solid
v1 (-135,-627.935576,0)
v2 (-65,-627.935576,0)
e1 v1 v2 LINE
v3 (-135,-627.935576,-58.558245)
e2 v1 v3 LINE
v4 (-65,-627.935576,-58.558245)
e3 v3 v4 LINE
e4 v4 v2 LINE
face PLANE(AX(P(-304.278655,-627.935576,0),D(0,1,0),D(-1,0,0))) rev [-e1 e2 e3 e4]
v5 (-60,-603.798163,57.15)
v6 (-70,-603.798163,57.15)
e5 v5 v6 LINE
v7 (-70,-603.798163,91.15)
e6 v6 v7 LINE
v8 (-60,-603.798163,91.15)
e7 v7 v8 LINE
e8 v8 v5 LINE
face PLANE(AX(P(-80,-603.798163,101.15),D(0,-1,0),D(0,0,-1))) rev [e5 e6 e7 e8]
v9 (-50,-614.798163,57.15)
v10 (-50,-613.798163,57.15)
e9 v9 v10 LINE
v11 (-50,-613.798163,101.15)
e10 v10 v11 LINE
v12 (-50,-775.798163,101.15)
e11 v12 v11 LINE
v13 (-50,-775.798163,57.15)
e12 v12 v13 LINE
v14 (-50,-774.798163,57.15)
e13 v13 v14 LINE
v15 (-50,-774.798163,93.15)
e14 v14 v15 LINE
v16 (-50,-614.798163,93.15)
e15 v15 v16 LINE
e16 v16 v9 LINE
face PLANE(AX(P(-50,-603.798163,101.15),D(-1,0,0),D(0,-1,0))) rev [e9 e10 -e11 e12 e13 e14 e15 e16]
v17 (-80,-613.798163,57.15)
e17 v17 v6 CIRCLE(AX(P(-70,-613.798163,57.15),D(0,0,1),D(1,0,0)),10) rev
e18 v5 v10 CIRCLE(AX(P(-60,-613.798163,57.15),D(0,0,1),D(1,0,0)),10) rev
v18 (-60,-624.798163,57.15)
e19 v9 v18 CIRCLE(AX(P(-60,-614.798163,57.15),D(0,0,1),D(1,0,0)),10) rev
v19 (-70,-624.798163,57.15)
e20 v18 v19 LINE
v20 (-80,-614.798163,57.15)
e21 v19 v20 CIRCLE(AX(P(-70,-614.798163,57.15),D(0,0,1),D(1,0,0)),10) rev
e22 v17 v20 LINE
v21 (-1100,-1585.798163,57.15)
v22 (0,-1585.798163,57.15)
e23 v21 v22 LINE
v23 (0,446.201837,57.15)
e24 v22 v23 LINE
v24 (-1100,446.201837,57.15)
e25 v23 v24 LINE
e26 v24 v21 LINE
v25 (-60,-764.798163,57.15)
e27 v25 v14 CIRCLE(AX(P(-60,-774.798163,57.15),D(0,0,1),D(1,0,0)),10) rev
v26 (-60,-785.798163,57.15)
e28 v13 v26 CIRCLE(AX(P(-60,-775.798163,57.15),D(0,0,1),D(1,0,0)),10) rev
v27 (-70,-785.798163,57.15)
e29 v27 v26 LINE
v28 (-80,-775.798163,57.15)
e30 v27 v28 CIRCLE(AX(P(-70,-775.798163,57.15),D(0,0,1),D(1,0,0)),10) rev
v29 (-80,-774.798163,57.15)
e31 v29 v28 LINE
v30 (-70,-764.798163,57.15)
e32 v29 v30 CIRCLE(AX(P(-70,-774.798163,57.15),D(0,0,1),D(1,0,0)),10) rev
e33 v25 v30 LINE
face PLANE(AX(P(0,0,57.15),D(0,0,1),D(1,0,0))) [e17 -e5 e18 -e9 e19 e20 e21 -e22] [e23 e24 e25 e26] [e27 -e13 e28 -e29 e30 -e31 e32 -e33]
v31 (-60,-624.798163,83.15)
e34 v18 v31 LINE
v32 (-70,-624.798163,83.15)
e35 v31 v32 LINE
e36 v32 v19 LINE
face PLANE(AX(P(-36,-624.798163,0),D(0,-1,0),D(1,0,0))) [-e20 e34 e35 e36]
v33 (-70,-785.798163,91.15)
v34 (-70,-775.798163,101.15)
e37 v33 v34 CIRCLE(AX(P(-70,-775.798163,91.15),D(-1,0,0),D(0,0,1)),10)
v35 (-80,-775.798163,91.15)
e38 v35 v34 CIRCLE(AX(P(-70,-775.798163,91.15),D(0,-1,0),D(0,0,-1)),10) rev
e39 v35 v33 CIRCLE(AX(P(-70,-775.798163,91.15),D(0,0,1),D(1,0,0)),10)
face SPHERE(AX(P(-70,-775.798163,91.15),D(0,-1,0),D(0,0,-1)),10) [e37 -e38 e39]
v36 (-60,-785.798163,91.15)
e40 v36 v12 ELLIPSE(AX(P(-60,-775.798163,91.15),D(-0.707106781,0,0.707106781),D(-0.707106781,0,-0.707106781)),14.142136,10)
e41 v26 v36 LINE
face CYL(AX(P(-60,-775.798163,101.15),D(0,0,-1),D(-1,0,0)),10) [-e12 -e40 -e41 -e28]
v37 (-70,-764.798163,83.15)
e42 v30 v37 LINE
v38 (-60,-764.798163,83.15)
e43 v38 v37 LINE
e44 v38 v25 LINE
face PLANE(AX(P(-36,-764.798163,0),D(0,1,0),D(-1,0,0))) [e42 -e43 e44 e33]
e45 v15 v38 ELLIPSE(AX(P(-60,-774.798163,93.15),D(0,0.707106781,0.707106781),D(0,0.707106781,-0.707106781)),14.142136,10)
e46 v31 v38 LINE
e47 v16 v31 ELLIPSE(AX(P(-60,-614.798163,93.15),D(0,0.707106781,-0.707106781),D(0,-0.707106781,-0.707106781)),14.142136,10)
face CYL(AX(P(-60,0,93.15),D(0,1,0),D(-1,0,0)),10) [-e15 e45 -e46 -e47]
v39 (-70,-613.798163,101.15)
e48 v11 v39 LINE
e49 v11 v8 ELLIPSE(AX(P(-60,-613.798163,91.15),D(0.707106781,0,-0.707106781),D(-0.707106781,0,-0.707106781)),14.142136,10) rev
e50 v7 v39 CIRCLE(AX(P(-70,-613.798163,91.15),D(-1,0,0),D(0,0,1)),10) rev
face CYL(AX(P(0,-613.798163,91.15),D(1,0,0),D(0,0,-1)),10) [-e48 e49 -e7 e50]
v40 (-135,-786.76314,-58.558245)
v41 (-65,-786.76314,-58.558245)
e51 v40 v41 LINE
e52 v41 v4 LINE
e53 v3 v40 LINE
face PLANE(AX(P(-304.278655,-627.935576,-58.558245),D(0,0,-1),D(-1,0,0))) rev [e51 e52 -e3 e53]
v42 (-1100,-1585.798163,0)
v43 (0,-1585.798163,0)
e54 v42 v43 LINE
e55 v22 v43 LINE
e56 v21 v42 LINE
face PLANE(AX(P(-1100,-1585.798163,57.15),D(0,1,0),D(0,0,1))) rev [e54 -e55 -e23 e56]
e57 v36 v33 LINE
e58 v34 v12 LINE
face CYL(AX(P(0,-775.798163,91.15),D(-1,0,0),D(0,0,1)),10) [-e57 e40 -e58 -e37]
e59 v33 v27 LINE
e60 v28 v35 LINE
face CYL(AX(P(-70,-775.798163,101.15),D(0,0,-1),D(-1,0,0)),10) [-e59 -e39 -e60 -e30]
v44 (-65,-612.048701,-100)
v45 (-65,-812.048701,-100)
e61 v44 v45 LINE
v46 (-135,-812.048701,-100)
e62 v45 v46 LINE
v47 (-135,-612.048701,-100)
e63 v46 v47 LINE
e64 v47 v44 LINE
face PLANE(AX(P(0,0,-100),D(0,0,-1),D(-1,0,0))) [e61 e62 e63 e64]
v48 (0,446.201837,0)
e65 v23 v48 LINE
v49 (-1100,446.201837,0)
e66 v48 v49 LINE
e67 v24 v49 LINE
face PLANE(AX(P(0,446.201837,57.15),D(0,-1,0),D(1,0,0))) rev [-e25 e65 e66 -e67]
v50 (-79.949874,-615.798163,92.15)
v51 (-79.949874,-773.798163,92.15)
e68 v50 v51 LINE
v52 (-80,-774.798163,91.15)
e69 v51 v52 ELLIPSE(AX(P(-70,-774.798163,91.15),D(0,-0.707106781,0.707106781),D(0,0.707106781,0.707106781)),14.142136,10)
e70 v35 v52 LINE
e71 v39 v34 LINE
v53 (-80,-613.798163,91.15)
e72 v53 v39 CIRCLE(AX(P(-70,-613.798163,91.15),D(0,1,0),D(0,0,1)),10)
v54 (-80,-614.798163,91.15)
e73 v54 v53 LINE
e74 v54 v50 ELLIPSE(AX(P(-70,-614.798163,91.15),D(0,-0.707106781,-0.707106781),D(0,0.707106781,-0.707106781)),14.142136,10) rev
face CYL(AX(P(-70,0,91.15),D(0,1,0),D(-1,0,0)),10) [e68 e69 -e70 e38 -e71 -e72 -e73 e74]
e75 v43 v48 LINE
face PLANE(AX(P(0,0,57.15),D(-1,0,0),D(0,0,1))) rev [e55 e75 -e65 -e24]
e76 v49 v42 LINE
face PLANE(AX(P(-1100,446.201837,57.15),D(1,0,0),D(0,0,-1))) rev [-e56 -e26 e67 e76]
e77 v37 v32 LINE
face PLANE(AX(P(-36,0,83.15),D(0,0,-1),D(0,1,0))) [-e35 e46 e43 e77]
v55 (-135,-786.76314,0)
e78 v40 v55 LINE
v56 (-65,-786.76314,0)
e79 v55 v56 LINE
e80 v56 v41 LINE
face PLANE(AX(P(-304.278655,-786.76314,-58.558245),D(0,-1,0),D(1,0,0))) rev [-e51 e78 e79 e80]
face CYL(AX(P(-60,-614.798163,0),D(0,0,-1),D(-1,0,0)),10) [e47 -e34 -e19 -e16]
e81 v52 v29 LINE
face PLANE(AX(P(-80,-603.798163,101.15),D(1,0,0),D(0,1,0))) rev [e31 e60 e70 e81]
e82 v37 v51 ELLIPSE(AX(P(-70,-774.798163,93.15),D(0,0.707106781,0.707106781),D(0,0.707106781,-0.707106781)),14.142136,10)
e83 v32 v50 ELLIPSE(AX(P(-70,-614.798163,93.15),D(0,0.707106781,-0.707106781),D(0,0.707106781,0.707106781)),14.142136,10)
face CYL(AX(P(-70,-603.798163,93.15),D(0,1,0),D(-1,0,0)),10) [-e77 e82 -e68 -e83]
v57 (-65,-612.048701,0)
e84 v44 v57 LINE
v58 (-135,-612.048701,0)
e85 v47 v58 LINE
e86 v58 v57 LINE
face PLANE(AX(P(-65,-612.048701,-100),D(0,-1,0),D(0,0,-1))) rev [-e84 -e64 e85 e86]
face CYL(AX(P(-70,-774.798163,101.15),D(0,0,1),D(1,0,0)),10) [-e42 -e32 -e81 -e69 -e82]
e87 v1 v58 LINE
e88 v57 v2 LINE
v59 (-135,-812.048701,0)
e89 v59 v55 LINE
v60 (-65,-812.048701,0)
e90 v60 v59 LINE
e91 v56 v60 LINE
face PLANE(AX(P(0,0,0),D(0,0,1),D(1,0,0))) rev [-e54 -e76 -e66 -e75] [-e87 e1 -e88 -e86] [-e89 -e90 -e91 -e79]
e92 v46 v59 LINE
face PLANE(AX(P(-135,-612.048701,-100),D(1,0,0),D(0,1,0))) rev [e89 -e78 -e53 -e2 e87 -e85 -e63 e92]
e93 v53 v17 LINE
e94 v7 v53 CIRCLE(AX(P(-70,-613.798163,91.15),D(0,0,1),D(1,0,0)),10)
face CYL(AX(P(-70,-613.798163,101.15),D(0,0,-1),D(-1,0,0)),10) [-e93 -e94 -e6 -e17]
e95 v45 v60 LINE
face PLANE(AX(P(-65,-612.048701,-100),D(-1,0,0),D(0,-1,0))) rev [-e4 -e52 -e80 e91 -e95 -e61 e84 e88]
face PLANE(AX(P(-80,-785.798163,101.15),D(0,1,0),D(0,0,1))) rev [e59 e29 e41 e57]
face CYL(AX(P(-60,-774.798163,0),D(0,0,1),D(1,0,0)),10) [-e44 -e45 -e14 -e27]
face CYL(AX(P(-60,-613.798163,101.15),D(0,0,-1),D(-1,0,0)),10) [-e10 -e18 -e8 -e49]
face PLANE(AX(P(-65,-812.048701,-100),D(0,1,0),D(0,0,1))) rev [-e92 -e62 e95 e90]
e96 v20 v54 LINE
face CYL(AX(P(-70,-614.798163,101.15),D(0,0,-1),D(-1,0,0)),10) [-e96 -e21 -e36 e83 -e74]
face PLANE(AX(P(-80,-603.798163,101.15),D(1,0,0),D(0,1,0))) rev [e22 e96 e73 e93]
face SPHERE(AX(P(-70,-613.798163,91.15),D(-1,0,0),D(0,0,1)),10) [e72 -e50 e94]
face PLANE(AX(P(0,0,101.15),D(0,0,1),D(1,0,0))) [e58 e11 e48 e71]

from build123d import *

# Parameters (mm, degrees)
BOSS_EXTRUDE2_DEPTH = 57.15
BOSS_EXTRUDE3_DEPTH = 44
CUT_EXTRUDE1_DEPTH  = 44
FILLET1_R           = 10
BOSS_EXTRUDE4_DEPTH = 100
SKETCH8_W           = 58.558244651631945
SKETCH8_H           = 158.82756414249673
CUT_EXTRUDE3_DEPTH  = 70


with BuildPart() as part:
    # Sketch1 → Boss-Extrude2 (new body)
    with BuildSketch(Plane.XY):
        Polygon((0, 0), (0, 446.2018372120283), (-1100, 446.2018372120282), (-1100, -1585.7981627879717), (0, -1585.7981627879717), align=None)
    extrude(amount=BOSS_EXTRUDE2_DEPTH)

    # Sketch4 → Boss-Extrude3 (add)
    with BuildSketch(Plane.XY.offset(57.15)):
        Polygon((-79.99999999999993, -603.7981627879718), (-49.999999999999936, -603.7981627879718), (-49.999999999999915, -785.7981627879718), (-79.9999999999999, -785.7981627879718), align=None)
    extrude(amount=BOSS_EXTRUDE3_DEPTH)

    # Sketch5 → Cut-Extrude1 (cut)
    with BuildSketch(Plane.ZY.offset(80.00000000000003)):
        Polygon((83.14999999999999, -624.7981627879717), (57.150000000000006, -624.7981627879717), (57.15, -764.7981627879717), (83.15, -764.7981627879717), align=None)
    extrude(amount=-CUT_EXTRUDE1_DEPTH, mode=Mode.SUBTRACT)

    # Fillet1
    # the kernel refuses this fillet: 10 mm, written as the material it takes off along each edge
    with BuildSketch(Plane(origin=(-69.99999999999993, -613.7981627879718, 91.15), x_dir=(-1, -1.6e-16, 0), z_dir=(0, 1, 0))) as fillet1_piece_1_section:
        Polygon((0, 0), (FILLET1_R, 0), (FILLET1_R, FILLET1_R), (0, FILLET1_R), align=None)
    fillet1_piece_1 = extrude(amount=FILLET1_R, mode=Mode.PRIVATE)
    fillet1_piece_1 = fillet1_piece_1 - Plane(origin=(-69.99999999999993, -613.7981627879718, 91.15), x_dir=(0.7071067811865475, 0, -0.7071067811865475), z_dir=(0, 1, 0)) * Sphere(FILLET1_R, mode=Mode.PRIVATE)
    add(fillet1_piece_1, mode=Mode.SUBTRACT)
    with BuildSketch(Plane(origin=(-69.9999999999999, -775.7981627879718, 91.15), x_dir=(0, 0, 1), z_dir=(-1, -1.6e-16, 0))) as fillet1_piece_2_section:
        Polygon((0, 0), (FILLET1_R, 0), (FILLET1_R, -FILLET1_R), (0, -FILLET1_R), align=None)
    fillet1_piece_2 = extrude(amount=FILLET1_R, mode=Mode.PRIVATE)
    fillet1_piece_2 = fillet1_piece_2 - Plane(origin=(-69.9999999999999, -775.7981627879718, 91.15), x_dir=(0, 0.7071067811865475, -0.7071067811865475), z_dir=(-1, -1.6e-16, 0)) * Sphere(FILLET1_R, mode=Mode.PRIVATE)
    add(fillet1_piece_2, mode=Mode.SUBTRACT)
    with BuildSketch(Plane(origin=(-49.999999999999915, -785.7981627879718, 57.15), x_dir=(-1, 0, 0), z_dir=(0, 0, 1))) as fillet1_piece_3:
        with BuildLine():
            CenterArc((FILLET1_R, -FILLET1_R), FILLET1_R, 90, 90)
            Line((0, -FILLET1_R), (0, 0))
            Line((0, 0), (FILLET1_R, 0))
        make_face()
    extrude(amount=69, mode=Mode.SUBTRACT)
    with BuildSketch(Plane(origin=(-49.999999999999936, -603.7981627879718, 57.15), x_dir=(0, -1, 0), z_dir=(0, 0, 1))) as fillet1_piece_4:
        with BuildLine():
            CenterArc((FILLET1_R, -FILLET1_R), FILLET1_R, 90, 90)
            Line((0, -FILLET1_R), (0, 0))
            Line((0, 0), (FILLET1_R, 0))
        make_face()
    extrude(amount=69, mode=Mode.SUBTRACT)
    with BuildSketch(Plane(origin=(-79.99999999999993, -603.7981627879718, 57.15), x_dir=(1, 0, 0), z_dir=(0, 0, 1))) as fillet1_piece_5:
        with BuildLine():
            CenterArc((FILLET1_R, -FILLET1_R), FILLET1_R, 90, 90)
            Line((0, -FILLET1_R), (0, 0))
            Line((0, 0), (FILLET1_R, 0))
        make_face()
    extrude(amount=34.00000000000001, mode=Mode.SUBTRACT)
    with BuildSketch(Plane(origin=(-79.9999999999999, -785.7981627879718, 57.15), x_dir=(1, 0, 0), z_dir=(0, 0, 1))) as fillet1_piece_6:
        with BuildLine():
            CenterArc((FILLET1_R, FILLET1_R), FILLET1_R, 180, 90)
            Line((0, FILLET1_R), (0, 0))
            Line((0, 0), (FILLET1_R, 0))
        make_face()
    extrude(amount=34.00000000000001, mode=Mode.SUBTRACT)
    with BuildSketch(Plane(origin=(-69.99999999999993, -603.7981627879718, 101.15), x_dir=(0, 0, -1), z_dir=(1, 0, 0))) as fillet1_piece_7:
        with BuildLine():
            CenterArc((FILLET1_R, -FILLET1_R), FILLET1_R, 90, 90)
            Line((0, -FILLET1_R), (0, 0))
            Line((0, 0), (FILLET1_R, 0))
        make_face()
    extrude(amount=44.99999999999999, mode=Mode.SUBTRACT)
    with BuildSketch(Plane(origin=(-79.9999999999999, -775.7981627879718, 101.15), x_dir=(0, 0, -1), z_dir=(-1.6e-16, 1, 0))) as fillet1_piece_8:
        with BuildLine():
            CenterArc((FILLET1_R, -FILLET1_R), FILLET1_R, 90, 90)
            Line((0, -FILLET1_R), (0, 0))
            Line((0, 0), (FILLET1_R, 0))
        make_face()
    extrude(amount=162, mode=Mode.SUBTRACT)
    with BuildSketch(Plane(origin=(-24.999999999999915, -785.7981627879718, 101.15), x_dir=(0, 0, -1), z_dir=(-1, 0, 0))) as fillet1_piece_9:
        with BuildLine():
            CenterArc((FILLET1_R, -FILLET1_R), FILLET1_R, 90, 90)
            Line((0, -FILLET1_R), (0, 0))
            Line((0, 0), (FILLET1_R, 0))
        make_face()
    extrude(amount=44.999999999999986, mode=Mode.SUBTRACT)
    with BuildSketch(Plane(origin=(-79.99999999999991, -764.7981627879717, 57.15000000000002), x_dir=(1.42e-15, -1, 0), z_dir=(0, 0, 1))) as fillet1_piece_10:
        with BuildLine():
            CenterArc((FILLET1_R, FILLET1_R), FILLET1_R, 180, 89.99999999999989)
            Line((1.421e-14, FILLET1_R), (0, 0))
            Line((0, 0), (FILLET1_R, 0))
        make_face()
    extrude(amount=25.999999999999986, mode=Mode.SUBTRACT)
    with BuildSketch(Plane(origin=(-79.99999999999993, -624.7981627879717, 83.14999999999999), x_dir=(0, 1, 0), z_dir=(0, 0, -1))) as fillet1_piece_11:
        with BuildLine():
            CenterArc((FILLET1_R, FILLET1_R), FILLET1_R, 180, 90)
            Line((0, FILLET1_R), (0, 0))
            Line((0, 0), (FILLET1_R, 0))
        make_face()
    extrude(amount=25.999999999999986, mode=Mode.SUBTRACT)
    with BuildSketch(Plane(origin=(-79.99999999999991, -764.7981627879717, 83.15), x_dir=(1.42e-15, 1e-16, 1), z_dir=(-1.5e-16, 1, -1e-16))) as fillet1_piece_12:
        with BuildLine():
            CenterArc((FILLET1_R, FILLET1_R), FILLET1_R, 180, 89.99999999999989)
            Line((1.421e-14, FILLET1_R), (0, 0))
            Line((0, 0), (FILLET1_R, 0))
        make_face()
    extrude(amount=140, mode=Mode.SUBTRACT)
    with BuildSketch(Plane(origin=(-49.999999999999915, -764.7981627879717, 83.15), x_dir=(0, -1, 0), z_dir=(0, 0, -1))) as fillet1_piece_13:
        with BuildLine():
            CenterArc((FILLET1_R, FILLET1_R), FILLET1_R, 180, 90)
            Line((0, FILLET1_R), (0, 0))
            Line((0, 0), (FILLET1_R, 0))
        make_face()
    extrude(amount=26, mode=Mode.SUBTRACT)
    with BuildSketch(Plane(origin=(-49.999999999999936, -624.7981627879717, 57.150000000000006), x_dir=(0, 1, 0), z_dir=(0, 0, 1))) as fillet1_piece_14:
        with BuildLine():
            CenterArc((FILLET1_R, FILLET1_R), FILLET1_R, 180.00000000000003, 90)
            Line((0, FILLET1_R), (0, 0))
            Line((0, 0), (FILLET1_R, 0))
        make_face()
    extrude(amount=25.999999999999986, mode=Mode.SUBTRACT)
    with BuildSketch(Plane(origin=(-49.999999999999936, -624.7981627879717, 83.15), x_dir=(0, 1e-16, 1), z_dir=(1.2e-16, -1, 1e-16))) as fillet1_piece_15:
        with BuildLine():
            CenterArc((FILLET1_R, FILLET1_R), FILLET1_R, 180, 90)
            Line((0, FILLET1_R), (0, 0))
            Line((0, 0), (FILLET1_R, 0))
        make_face()
    extrude(amount=140, mode=Mode.SUBTRACT)
    with BuildSketch(Plane(origin=(-79.99999999999991, -764.7981627879717, 57.15000000000002), x_dir=(1.42e-15, -1, 0), z_dir=(0, 0, 1))) as fillet1_piece_16a_section:
        with BuildLine():
            CenterArc((FILLET1_R, FILLET1_R), FILLET1_R, 180, 89.99999999999989)
            Line((1.421e-14, FILLET1_R), (0, 0))
            Line((0, 0), (FILLET1_R, 0))
        make_face()
    fillet1_piece_16a = extrude(amount=50.999999999999986, mode=Mode.PRIVATE)
    fillet1_piece_16a = split(fillet1_piece_16a, bisect_by=Plane(origin=(-77.7360488573316, -767.0621139306398, 83.15), z_dir=(0, 1e-16, 1)), keep=Keep.TOP, mode=Mode.PRIVATE)
    with BuildSketch(Plane(origin=(-79.9999999999999, -789.7981627879717, 83.15), x_dir=(0, 1e-16, 1), z_dir=(-1.5e-16, 1, -1e-16))) as fillet1_piece_16b_section:
        with BuildLine():
            CenterArc((FILLET1_R, FILLET1_R), FILLET1_R, 180, 90)
            Line((0, FILLET1_R), (0, 0))
            Line((0, 0), (FILLET1_R, 0))
        make_face()
    fillet1_piece_16b = extrude(amount=165, mode=Mode.PRIVATE)
    fillet1_piece_16b = split(fillet1_piece_16b, bisect_by=Plane(origin=(-77.73604885733165, -764.7981627879717, 85.41395114266827), z_dir=(1.5e-16, -1, 0)), keep=Keep.TOP, mode=Mode.PRIVATE)
    fillet1_piece_16 = fillet1_piece_16a & fillet1_piece_16b
    add(fillet1_piece_16, mode=Mode.SUBTRACT)
    with BuildSketch(Plane(origin=(-79.99999999999991, -764.7981627879717, 83.15), x_dir=(1.42e-15, 1e-16, 1), z_dir=(-1.5e-16, 1, -1e-16))) as fillet1_piece_17a_section:
        with BuildLine():
            CenterArc((FILLET1_R, FILLET1_R), FILLET1_R, 180, 89.99999999999989)
            Line((1.421e-14, FILLET1_R), (0, 0))
            Line((0, 0), (FILLET1_R, 0))
        make_face()
    fillet1_piece_17a = extrude(amount=165, mode=Mode.PRIVATE)
    fillet1_piece_17a = split(fillet1_piece_17a, bisect_by=Plane(origin=(-77.73604885733167, -624.7981627879717, 85.41395114266825), z_dir=(-1.5e-16, 1, 0)), keep=Keep.TOP, mode=Mode.PRIVATE)
    with BuildSketch(Plane(origin=(-79.99999999999993, -624.7981627879717, 108.14999999999998), x_dir=(0, 1, 0), z_dir=(0, 0, -1))) as fillet1_piece_17b_section:
        with BuildLine():
            CenterArc((FILLET1_R, FILLET1_R), FILLET1_R, 180, 90)
            Line((0, FILLET1_R), (0, 0))
            Line((0, 0), (FILLET1_R, 0))
        make_face()
    fillet1_piece_17b = extrude(amount=50.999999999999986, mode=Mode.PRIVATE)
    fillet1_piece_17b = split(fillet1_piece_17b, bisect_by=Plane(origin=(-77.73604885733164, -622.5342116453035, 83.14999999999999), z_dir=(0, 1e-16, 1)), keep=Keep.TOP, mode=Mode.PRIVATE)
    fillet1_piece_17 = fillet1_piece_17a & fillet1_piece_17b
    add(fillet1_piece_17, mode=Mode.SUBTRACT)
    with BuildSketch(Plane(origin=(-49.999999999999936, -624.7981627879717, 83.15), x_dir=(0, 1e-16, 1), z_dir=(1.2e-16, -1, 1e-16))) as fillet1_piece_18a_section:
        with BuildLine():
            CenterArc((FILLET1_R, FILLET1_R), FILLET1_R, 180, 90)
            Line((0, FILLET1_R), (0, 0))
            Line((0, 0), (FILLET1_R, 0))
        make_face()
    fillet1_piece_18a = extrude(amount=165, mode=Mode.PRIVATE)
    fillet1_piece_18a = split(fillet1_piece_18a, bisect_by=Plane(origin=(-52.26395114266817, -764.7981627879717, 85.41395114266827), z_dir=(1.5e-16, -1, 0)), keep=Keep.TOP, mode=Mode.PRIVATE)
    with BuildSketch(Plane(origin=(-49.999999999999915, -764.7981627879717, 108.15), x_dir=(0, -1, 0), z_dir=(0, 0, -1))) as fillet1_piece_18b_section:
        with BuildLine():
            CenterArc((FILLET1_R, FILLET1_R), FILLET1_R, 180, 90)
            Line((0, FILLET1_R), (0, 0))
            Line((0, 0), (FILLET1_R, 0))
        make_face()
    fillet1_piece_18b = extrude(amount=51, mode=Mode.PRIVATE)
    fillet1_piece_18b = split(fillet1_piece_18b, bisect_by=Plane(origin=(-52.2639511426682, -767.0621139306397, 83.15), z_dir=(0, 1e-16, 1)), keep=Keep.TOP, mode=Mode.PRIVATE)
    fillet1_piece_18 = fillet1_piece_18a & fillet1_piece_18b
    add(fillet1_piece_18, mode=Mode.SUBTRACT)
    with BuildSketch(Plane(origin=(-49.999999999999936, -624.7981627879717, 57.150000000000006), x_dir=(0, 1, 0), z_dir=(0, 0, 1))) as fillet1_piece_19a_section:
        with BuildLine():
            CenterArc((FILLET1_R, FILLET1_R), FILLET1_R, 180.00000000000003, 90)
            Line((0, FILLET1_R), (0, 0))
            Line((0, 0), (FILLET1_R, 0))
        make_face()
    fillet1_piece_19a = extrude(amount=50.999999999999986, mode=Mode.PRIVATE)
    fillet1_piece_19a = split(fillet1_piece_19a, bisect_by=Plane(origin=(-52.26395114266823, -622.5342116453035, 83.14999999999999), z_dir=(0, 1e-16, 1)), keep=Keep.TOP, mode=Mode.PRIVATE)
    with BuildSketch(Plane(origin=(-49.999999999999936, -599.7981627879717, 83.14999999999999), x_dir=(0, 1e-16, 1), z_dir=(1.2e-16, -1, 1e-16))) as fillet1_piece_19b_section:
        with BuildLine():
            CenterArc((FILLET1_R, FILLET1_R), FILLET1_R, 179.99999999999997, 90)
            Line((0, FILLET1_R), (0, 0))
            Line((0, 0), (FILLET1_R, 0))
        make_face()
    fillet1_piece_19b = extrude(amount=165, mode=Mode.PRIVATE)
    fillet1_piece_19b = split(fillet1_piece_19b, bisect_by=Plane(origin=(-52.26395114266818, -624.7981627879717, 85.41395114266824), z_dir=(-1.5e-16, 1, 0)), keep=Keep.TOP, mode=Mode.PRIVATE)
    fillet1_piece_19 = fillet1_piece_19a & fillet1_piece_19b
    add(fillet1_piece_19, mode=Mode.SUBTRACT)

    # Sketch6 → Boss-Extrude4 (add)
    with BuildSketch(Plane(origin=(0, 0, 0), x_dir=(-1, 0, 0), z_dir=(0, 0, -1))):
        Polygon((64.99999999999997, -612.0487005102074), (134.99999999999994, -612.0487005102074), (135, -812.0487005102073), (65, -812.0487005102073), align=None)
    extrude(amount=BOSS_EXTRUDE4_DEPTH)

    # Sketch8 → Cut-Extrude3 (cut)
    with BuildSketch(Plane(origin=(-64.99999999999989, 9.02e-15, 0), x_dir=(0, 0, -1), z_dir=(1, -1.4e-16, 0))):
        with Locations((29.279122325815973, -707.3493580183326)):
            Rectangle(SKETCH8_W, SKETCH8_H)
    extrude(amount=-CUT_EXTRUDE3_DEPTH, mode=Mode.SUBTRACT)


solid = part.part
